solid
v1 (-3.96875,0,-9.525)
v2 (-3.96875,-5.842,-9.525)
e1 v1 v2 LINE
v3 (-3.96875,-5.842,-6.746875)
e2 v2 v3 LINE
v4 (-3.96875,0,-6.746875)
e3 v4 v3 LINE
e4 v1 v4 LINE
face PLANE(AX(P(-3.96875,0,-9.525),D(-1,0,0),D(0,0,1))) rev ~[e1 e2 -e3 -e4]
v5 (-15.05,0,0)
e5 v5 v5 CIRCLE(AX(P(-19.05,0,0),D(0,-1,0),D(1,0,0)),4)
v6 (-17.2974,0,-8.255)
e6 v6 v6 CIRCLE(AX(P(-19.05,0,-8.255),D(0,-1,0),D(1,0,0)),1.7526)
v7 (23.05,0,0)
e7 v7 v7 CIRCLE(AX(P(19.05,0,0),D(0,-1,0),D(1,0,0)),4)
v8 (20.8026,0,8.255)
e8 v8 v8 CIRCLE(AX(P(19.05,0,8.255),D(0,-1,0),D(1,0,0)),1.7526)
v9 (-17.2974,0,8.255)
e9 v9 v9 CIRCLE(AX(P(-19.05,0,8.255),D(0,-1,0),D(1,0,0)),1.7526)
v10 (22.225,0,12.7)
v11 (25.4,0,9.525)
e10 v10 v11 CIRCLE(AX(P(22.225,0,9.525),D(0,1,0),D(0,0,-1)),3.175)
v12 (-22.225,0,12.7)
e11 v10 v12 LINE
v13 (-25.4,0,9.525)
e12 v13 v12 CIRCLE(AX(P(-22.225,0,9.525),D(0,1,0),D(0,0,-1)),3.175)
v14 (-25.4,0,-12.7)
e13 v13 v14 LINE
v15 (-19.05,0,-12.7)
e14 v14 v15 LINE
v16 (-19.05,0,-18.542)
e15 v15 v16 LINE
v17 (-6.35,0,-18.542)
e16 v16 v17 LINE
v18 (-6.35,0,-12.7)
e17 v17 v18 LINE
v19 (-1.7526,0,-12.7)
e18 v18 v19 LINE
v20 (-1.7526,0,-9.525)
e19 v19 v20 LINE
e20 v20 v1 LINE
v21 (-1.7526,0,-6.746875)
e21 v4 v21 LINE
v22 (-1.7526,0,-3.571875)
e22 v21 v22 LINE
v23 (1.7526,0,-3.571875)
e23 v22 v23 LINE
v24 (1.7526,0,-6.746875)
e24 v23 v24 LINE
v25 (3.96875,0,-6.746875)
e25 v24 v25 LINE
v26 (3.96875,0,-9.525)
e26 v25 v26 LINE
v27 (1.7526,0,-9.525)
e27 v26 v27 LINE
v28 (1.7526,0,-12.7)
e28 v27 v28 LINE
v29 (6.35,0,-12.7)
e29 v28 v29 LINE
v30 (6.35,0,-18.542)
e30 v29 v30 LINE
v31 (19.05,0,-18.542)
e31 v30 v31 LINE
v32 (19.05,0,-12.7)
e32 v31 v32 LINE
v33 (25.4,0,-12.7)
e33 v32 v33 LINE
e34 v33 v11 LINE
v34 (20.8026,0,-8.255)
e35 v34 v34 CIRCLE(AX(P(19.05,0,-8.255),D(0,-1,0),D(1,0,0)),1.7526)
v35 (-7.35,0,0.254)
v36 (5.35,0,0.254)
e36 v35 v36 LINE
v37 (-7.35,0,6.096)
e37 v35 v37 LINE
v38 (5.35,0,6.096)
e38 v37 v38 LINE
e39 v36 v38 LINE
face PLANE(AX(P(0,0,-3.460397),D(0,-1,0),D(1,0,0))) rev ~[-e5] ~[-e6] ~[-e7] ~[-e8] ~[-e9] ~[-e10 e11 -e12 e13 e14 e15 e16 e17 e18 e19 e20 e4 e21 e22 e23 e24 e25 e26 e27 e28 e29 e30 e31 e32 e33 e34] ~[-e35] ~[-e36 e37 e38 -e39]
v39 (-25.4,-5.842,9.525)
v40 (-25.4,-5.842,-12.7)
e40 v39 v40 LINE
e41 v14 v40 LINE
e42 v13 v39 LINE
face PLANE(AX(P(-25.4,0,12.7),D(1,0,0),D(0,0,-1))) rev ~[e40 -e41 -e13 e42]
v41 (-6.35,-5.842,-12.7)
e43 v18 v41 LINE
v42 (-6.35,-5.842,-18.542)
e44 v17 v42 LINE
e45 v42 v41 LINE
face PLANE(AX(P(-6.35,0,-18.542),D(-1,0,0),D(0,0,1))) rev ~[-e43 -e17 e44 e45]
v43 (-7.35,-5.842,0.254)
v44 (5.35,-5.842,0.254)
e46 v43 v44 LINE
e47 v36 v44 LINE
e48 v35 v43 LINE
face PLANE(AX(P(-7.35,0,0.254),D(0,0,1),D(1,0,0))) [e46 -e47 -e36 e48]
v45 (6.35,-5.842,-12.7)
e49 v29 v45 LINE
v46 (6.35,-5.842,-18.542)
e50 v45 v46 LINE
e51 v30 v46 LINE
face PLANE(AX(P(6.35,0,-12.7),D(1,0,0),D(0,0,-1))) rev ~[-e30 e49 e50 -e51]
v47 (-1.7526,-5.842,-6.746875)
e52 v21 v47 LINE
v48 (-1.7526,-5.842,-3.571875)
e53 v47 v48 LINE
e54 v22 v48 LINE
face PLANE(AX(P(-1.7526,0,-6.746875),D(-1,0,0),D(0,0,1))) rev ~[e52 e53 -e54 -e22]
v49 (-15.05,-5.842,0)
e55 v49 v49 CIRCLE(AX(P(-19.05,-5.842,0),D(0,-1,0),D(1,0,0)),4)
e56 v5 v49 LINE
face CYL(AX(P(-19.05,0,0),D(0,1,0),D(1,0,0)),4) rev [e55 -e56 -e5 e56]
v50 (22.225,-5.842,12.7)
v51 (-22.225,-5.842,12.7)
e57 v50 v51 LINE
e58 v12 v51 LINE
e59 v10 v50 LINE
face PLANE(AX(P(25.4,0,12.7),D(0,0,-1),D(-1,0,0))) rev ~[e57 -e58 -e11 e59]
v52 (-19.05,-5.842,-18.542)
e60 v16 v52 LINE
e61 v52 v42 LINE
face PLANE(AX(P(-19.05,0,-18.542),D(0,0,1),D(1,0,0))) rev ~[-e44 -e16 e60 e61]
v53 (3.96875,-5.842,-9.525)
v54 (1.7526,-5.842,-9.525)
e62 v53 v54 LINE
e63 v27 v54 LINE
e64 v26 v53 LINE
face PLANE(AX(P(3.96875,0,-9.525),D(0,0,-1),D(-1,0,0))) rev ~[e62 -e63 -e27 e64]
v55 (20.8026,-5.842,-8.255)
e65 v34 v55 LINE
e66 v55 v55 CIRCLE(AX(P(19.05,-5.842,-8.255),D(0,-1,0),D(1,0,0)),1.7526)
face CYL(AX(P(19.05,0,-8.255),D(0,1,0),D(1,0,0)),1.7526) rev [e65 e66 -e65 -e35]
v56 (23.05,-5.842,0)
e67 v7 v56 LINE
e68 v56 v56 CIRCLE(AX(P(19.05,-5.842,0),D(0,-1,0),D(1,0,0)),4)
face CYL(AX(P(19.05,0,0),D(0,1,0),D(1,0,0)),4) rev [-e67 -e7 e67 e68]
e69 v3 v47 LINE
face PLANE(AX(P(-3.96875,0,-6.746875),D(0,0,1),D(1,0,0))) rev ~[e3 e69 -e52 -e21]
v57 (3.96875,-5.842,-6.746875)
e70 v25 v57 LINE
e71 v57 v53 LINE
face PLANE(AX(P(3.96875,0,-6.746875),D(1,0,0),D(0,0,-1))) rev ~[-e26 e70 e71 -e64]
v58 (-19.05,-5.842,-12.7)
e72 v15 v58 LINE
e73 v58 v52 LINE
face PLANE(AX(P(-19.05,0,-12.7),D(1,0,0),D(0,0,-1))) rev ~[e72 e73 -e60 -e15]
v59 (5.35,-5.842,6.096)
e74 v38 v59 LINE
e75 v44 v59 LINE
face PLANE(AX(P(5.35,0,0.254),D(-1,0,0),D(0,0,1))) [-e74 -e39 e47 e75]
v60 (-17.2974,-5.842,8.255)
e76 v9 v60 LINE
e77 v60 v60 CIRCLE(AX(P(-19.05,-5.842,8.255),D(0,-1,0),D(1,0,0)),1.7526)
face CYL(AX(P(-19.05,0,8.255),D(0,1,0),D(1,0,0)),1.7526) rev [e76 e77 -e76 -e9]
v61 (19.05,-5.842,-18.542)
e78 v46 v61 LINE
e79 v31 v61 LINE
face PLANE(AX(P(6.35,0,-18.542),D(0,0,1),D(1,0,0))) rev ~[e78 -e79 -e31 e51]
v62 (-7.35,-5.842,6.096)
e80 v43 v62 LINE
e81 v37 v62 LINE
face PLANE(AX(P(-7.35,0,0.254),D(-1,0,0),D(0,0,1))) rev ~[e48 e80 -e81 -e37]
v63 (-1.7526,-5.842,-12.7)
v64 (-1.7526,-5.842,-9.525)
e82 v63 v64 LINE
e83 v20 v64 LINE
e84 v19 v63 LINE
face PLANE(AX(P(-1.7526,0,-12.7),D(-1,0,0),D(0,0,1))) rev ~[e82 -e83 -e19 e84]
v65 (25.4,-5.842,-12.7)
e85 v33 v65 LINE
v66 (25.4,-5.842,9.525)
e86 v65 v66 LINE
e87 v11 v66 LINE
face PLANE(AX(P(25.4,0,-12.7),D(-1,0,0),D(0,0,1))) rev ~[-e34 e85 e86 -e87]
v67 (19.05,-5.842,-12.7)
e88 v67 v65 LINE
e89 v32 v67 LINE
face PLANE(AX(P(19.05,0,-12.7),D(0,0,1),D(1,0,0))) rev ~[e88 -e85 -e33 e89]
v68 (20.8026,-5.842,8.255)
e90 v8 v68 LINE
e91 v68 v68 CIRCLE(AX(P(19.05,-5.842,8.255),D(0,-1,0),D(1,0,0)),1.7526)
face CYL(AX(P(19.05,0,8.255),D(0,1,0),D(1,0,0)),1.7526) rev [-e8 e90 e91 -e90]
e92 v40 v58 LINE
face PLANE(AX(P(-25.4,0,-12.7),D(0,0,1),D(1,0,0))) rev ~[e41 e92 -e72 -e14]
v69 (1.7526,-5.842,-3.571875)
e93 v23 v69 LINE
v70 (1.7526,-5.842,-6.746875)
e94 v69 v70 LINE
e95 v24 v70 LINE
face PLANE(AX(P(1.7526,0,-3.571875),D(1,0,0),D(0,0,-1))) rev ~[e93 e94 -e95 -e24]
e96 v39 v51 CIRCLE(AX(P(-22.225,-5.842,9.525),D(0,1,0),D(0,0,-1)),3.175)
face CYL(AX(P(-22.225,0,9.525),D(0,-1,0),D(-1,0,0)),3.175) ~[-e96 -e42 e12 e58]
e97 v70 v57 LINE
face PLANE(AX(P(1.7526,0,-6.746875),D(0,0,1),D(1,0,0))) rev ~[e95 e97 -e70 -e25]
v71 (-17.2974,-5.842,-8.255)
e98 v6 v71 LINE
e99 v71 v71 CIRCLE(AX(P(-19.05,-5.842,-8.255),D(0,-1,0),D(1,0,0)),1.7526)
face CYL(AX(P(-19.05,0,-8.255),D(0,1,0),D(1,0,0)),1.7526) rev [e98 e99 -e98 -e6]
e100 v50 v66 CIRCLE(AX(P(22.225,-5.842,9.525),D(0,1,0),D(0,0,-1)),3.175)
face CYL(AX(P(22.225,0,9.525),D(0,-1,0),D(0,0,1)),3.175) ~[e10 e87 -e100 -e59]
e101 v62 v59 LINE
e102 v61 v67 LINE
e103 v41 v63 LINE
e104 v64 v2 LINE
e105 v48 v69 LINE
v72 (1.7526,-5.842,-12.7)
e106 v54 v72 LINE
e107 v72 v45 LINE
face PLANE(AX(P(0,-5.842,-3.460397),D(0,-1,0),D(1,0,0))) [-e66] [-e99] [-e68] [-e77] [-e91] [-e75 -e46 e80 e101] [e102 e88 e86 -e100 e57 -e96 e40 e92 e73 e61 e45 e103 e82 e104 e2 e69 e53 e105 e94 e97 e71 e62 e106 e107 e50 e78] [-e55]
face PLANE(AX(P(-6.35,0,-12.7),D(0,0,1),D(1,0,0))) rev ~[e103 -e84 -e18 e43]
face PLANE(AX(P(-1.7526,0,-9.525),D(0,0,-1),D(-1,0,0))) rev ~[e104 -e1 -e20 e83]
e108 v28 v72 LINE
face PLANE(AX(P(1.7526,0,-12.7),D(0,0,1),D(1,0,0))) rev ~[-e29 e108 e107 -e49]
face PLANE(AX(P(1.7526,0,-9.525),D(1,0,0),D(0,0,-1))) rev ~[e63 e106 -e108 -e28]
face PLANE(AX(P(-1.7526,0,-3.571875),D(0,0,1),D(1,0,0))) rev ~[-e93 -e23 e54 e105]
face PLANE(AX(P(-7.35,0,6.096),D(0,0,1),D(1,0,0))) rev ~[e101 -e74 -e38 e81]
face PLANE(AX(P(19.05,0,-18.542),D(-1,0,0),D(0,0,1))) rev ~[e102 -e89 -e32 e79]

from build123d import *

# Parameters (mm, degrees)
F0_R     = 1.7526
F0_R_2   = 4
F0_W     = 12.7
F0_H     = 5.842
F1_DEPTH = 5.842
F2_R     = 3.175


# Not quite as in the source:
# - a feature names something its author has since deleted; it is built from what else it names


with BuildPart() as f1:
    # F0 (on Front) → F1 (new body)
    with BuildSketch(Plane.XZ):
        Polygon((-12.7, 12.7), (-25.4, 12.7), (-25.4, -12.7), (-19.05, -12.7), (-19.05, -18.542), (-6.35, -18.542), (-6.35, -12.7), (-1.7526, -12.7), (-1.7526, -9.525), (-3.96875, -9.525), (-3.96875, -6.746875), (-1.7526, -6.746875), (-1.7526, -3.571875), (1.7526, -3.571875), (1.7526, -6.746875), (3.96875, -6.746875), (3.96875, -9.525), (1.7526, -9.525), (1.7526, -12.7), (6.35, -12.7), (6.35, -18.542), (19.05, -18.542), (19.05, -12.7), (25.4, -12.7), (25.4, 12.7), (12.7, 12.7), align=None)
        with Locations((-19.05, -8.255)):
            Circle(F0_R, mode=Mode.SUBTRACT)
        with Locations((19.05, -8.255)):
            Circle(F0_R, mode=Mode.SUBTRACT)
        with Locations((-19.05, 0)):
            Circle(F0_R_2, mode=Mode.SUBTRACT)
        with Locations((-1, 3.175)):
            Rectangle(F0_W, F0_H, mode=Mode.SUBTRACT)
        with Locations((-19.05, 8.255)):
            Circle(F0_R, mode=Mode.SUBTRACT)
        with Locations((19.05, 0)):
            Circle(F0_R_2, mode=Mode.SUBTRACT)
        with Locations((19.05, 8.255)):
            Circle(F0_R, mode=Mode.SUBTRACT)
    extrude(amount=F1_DEPTH)

    # F2
    f2_edges = [f1.edges().sort_by_distance(p)[0] for p in [
        (-25.4, -2.921, 12.7),
        (25.4, -2.921, 12.7),
    ]]
    fillet(f2_edges, radius=F2_R)


solid = f1.part
